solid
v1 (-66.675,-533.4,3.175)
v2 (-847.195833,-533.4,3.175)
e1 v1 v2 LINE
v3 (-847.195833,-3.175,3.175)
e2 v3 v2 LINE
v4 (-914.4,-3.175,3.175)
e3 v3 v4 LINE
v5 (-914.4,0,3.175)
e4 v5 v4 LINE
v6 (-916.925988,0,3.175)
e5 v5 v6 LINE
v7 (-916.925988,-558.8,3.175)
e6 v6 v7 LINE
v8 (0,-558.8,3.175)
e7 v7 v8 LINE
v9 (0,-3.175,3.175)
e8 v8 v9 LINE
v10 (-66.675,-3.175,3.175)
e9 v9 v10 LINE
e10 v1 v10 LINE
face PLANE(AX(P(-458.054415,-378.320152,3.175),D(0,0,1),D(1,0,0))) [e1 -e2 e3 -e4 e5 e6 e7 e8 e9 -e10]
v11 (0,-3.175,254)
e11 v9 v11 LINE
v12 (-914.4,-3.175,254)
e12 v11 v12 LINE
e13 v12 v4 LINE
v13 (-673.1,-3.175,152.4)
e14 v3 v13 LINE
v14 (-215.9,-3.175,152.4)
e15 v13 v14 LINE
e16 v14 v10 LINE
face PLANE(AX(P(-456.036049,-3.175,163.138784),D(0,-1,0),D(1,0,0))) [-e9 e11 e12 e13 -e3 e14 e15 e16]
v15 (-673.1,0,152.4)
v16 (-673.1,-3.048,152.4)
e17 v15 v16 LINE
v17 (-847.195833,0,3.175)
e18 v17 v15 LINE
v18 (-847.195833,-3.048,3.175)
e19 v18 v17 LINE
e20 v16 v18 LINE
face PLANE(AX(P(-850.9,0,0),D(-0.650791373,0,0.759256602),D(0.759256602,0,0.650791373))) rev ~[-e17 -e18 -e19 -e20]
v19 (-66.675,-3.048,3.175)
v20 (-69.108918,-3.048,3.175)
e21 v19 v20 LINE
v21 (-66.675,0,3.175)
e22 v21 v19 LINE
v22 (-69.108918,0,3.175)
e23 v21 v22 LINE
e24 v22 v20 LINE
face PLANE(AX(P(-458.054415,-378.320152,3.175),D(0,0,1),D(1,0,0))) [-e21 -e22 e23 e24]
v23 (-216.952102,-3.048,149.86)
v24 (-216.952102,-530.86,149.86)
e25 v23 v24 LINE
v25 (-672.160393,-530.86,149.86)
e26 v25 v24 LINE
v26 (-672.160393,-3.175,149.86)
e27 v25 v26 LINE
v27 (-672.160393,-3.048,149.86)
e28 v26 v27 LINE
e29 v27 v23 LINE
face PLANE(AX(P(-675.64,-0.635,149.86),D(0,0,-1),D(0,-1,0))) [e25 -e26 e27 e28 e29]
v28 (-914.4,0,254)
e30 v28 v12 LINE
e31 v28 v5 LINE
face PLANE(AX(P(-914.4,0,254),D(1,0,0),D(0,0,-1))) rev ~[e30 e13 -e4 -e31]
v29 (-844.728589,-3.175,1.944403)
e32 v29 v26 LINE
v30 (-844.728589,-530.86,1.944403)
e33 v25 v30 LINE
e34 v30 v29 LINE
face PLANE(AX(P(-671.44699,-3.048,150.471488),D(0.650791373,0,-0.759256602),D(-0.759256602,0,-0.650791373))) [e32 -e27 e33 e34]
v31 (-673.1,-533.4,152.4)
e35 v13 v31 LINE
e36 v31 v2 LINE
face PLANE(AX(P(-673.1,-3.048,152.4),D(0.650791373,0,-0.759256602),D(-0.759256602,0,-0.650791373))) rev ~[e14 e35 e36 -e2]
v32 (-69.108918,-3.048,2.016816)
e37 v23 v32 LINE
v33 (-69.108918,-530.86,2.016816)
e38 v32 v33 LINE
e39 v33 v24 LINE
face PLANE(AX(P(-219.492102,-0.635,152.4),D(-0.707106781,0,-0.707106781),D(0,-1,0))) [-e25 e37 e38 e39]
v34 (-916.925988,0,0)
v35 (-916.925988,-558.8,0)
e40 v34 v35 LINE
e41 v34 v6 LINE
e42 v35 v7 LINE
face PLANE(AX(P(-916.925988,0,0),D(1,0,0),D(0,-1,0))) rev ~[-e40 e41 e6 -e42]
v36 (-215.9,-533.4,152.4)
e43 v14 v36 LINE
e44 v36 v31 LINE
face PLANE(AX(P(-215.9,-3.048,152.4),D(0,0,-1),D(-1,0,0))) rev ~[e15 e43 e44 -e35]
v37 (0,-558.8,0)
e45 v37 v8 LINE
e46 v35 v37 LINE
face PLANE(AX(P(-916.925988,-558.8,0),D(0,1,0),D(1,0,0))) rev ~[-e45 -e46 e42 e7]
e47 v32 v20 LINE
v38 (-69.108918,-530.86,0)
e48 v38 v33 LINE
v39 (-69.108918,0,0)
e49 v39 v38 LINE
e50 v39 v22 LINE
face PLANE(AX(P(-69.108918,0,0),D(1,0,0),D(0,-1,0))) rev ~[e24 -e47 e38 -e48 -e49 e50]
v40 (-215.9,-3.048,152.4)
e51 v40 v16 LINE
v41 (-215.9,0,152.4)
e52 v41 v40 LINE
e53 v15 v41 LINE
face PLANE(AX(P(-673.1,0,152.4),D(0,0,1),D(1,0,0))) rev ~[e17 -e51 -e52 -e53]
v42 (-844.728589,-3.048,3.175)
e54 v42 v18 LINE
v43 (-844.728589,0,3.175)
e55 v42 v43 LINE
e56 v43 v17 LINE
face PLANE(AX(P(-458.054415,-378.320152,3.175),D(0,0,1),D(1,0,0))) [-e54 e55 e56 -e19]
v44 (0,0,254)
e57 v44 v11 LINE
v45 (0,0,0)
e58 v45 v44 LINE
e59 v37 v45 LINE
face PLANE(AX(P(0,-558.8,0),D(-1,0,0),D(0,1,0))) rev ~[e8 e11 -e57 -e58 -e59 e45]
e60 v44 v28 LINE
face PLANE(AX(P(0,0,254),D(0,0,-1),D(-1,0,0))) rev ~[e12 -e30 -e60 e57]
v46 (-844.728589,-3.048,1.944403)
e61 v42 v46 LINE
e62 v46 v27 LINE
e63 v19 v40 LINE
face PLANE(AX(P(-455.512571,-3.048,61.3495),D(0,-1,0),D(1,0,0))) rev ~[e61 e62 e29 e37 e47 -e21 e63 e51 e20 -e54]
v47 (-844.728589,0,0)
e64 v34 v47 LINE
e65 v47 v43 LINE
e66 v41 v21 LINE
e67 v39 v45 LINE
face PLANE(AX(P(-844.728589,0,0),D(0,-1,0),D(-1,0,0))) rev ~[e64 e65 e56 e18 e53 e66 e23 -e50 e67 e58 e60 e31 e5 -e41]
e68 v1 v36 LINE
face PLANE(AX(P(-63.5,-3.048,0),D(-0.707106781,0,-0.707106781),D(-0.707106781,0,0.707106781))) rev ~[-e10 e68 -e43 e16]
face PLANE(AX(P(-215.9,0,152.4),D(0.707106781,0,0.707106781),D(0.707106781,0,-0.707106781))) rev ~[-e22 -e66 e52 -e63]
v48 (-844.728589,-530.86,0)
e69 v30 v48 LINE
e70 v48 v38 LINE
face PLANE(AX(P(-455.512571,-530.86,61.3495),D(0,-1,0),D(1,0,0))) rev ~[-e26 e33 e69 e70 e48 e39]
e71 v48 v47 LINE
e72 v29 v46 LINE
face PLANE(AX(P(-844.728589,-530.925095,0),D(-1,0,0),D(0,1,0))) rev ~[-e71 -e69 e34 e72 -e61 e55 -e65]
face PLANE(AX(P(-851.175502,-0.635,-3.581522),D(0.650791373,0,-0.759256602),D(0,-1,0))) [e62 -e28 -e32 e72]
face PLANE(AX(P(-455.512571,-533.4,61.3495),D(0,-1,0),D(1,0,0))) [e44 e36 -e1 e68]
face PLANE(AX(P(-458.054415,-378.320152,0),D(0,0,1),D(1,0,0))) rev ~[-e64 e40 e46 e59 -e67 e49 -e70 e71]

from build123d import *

# Parameters (mm, degrees)
F1_DEPTH    = 3.175
F2_START    = 3.048
F2_DEPTH    = 530.352
F3_T        = 2.54
F3_T3_DEPTH = 8.128
F3_T5_DEPTH = 220.6061469057
F3_T7_DEPTH = 239.2564292152
F3_T9_DEPTH = 462.28
F5_DEPTH    = 3.175


# Not quite as in the source:
# - a shell that OpenCascade refuses in one call is made with other operations: the cavity is built on its own and cut out


with BuildPart() as f1:
    # F0 (on Front) → F1 (new body)
    with BuildSketch(Plane.XZ):
        Polygon((-63.5, 0), (0, 0), (0, 254), (-914.4, 254), (-914.4, 0), (-850.9, 0), (-673.1, 152.4), (-215.9, 152.4), align=None)
    extrude(amount=F1_DEPTH)

    # F0 (on Front) → F2 (join)
    with BuildSketch(Plane.XZ.offset(F2_START)):
        Polygon((-850.9, 0), (-63.5, 0), (-215.9, 152.4), (-673.1, 152.4), align=None)
    extrude(amount=F2_DEPTH)

    # F3: shell of thickness 2.54, made by hand


with BuildPart() as f3_core1:
    # F3_t2: copy of F1
    add(f1.part)

    # the walls: a layer under each face that stays
    f3_faces = [f3_core1.faces().sort_by_distance(p)[0] for p in [
        (-139.7, -1.524, 76.2),
        (-762, 0, 127),
        (-444.5, -1.524, 152.4),
        (0, -1.5875, 127),
        (-457.2, -1.5875, 254),
        (-914.4, -1.5875, 127),
        (-762, -1.524, 76.2),
        (-762, -3.175, 127),
        (-762, -268.2875, 76.2),
        (-139.7, -268.2875, 76.2),
        (-457.2, -533.4, 76.2),
        (-444.5, -268.2875, 152.4),
    ]]
    thicken(f3_faces, amount=-F3_T, mode=Mode.SUBTRACT)

    # F3_s4 → F3_t3 (cut)
    with BuildSketch(Plane.XZ.offset(-2.54)):
        Polygon((-215.9179605122, 152.3566394878), (-214.1039487758, 154.1960512242), (-214.8478975516, 154.94), (-215.9, 154.94), align=None)
        Polygon((-673.0834698991, 152.3553148823), (-673.1, 154.94), (-674.0396071536, 154.94), (-674.7530100886, 154.32851177), align=None)
    extrude(amount=F3_T3_DEPTH, mode=Mode.SUBTRACT)

    # F3_s6 → F3_t5 (cut)
    with BuildSketch(Plane(origin=(-185.9460512242, 0, 185.9460512242), x_dir=(0, 1, 0), z_dir=(0.7071067812, 0, -0.7071067812))):
        Polygon((-3.2004, -44.8758806053), (-0.635, -44.9012806053), (-0.635, -47.4412806053), (-3.175, -47.4412806053), align=None)
    extrude(amount=F3_T5_DEPTH, mode=Mode.SUBTRACT)

    # F3_s8 → F3_t7 (cut)
    with BuildSketch(Plane(origin=(-492.4473352994, 0, -422.0977159709), x_dir=(0, 1, 0), z_dir=(0.7592566024, 0, 0.6507913735))):
        Polygon((-3.2004, 553.7837796737), (-0.635, 553.7583796737), (-0.635, 551.2183796737), (-3.175, 551.2183796737), align=None)
    extrude(amount=F3_T7_DEPTH, mode=Mode.SUBTRACT)

    # F3_s10 → F3_t9 (cut)
    with BuildSketch(Plane.YZ.offset(-675.64)):
        Polygon((-3.2004, 152.4254), (-0.635, 152.4), (-0.635, 149.86), (-3.175, 149.86), align=None)
    extrude(amount=F3_T9_DEPTH, mode=Mode.SUBTRACT)


with BuildPart() as f1_1:
    add(f1.part)

    # what is left inside the walls is the cavity
    f3_cavity = [f3_core1.part.solids().sort_by_distance(p)[0] for p in [
        (-457.044581, -354.922667, 0.0254),
    ]]
    add(f3_cavity, mode=Mode.SUBTRACT)

    # F4 (on Top) → F5 (join)
    with BuildSketch(Plane.XY):
        Polygon((0, -558.8), (0, 0), (-69.1089183092, 0), (-69.1089183092, -530.9250950813), (-844.7285890579, -530.9250950813), (-844.7285890579, 0), (-916.9259883143, 0), (-916.9259883143, -558.8), align=None)
    extrude(amount=F5_DEPTH)


solid = f1_1.part
